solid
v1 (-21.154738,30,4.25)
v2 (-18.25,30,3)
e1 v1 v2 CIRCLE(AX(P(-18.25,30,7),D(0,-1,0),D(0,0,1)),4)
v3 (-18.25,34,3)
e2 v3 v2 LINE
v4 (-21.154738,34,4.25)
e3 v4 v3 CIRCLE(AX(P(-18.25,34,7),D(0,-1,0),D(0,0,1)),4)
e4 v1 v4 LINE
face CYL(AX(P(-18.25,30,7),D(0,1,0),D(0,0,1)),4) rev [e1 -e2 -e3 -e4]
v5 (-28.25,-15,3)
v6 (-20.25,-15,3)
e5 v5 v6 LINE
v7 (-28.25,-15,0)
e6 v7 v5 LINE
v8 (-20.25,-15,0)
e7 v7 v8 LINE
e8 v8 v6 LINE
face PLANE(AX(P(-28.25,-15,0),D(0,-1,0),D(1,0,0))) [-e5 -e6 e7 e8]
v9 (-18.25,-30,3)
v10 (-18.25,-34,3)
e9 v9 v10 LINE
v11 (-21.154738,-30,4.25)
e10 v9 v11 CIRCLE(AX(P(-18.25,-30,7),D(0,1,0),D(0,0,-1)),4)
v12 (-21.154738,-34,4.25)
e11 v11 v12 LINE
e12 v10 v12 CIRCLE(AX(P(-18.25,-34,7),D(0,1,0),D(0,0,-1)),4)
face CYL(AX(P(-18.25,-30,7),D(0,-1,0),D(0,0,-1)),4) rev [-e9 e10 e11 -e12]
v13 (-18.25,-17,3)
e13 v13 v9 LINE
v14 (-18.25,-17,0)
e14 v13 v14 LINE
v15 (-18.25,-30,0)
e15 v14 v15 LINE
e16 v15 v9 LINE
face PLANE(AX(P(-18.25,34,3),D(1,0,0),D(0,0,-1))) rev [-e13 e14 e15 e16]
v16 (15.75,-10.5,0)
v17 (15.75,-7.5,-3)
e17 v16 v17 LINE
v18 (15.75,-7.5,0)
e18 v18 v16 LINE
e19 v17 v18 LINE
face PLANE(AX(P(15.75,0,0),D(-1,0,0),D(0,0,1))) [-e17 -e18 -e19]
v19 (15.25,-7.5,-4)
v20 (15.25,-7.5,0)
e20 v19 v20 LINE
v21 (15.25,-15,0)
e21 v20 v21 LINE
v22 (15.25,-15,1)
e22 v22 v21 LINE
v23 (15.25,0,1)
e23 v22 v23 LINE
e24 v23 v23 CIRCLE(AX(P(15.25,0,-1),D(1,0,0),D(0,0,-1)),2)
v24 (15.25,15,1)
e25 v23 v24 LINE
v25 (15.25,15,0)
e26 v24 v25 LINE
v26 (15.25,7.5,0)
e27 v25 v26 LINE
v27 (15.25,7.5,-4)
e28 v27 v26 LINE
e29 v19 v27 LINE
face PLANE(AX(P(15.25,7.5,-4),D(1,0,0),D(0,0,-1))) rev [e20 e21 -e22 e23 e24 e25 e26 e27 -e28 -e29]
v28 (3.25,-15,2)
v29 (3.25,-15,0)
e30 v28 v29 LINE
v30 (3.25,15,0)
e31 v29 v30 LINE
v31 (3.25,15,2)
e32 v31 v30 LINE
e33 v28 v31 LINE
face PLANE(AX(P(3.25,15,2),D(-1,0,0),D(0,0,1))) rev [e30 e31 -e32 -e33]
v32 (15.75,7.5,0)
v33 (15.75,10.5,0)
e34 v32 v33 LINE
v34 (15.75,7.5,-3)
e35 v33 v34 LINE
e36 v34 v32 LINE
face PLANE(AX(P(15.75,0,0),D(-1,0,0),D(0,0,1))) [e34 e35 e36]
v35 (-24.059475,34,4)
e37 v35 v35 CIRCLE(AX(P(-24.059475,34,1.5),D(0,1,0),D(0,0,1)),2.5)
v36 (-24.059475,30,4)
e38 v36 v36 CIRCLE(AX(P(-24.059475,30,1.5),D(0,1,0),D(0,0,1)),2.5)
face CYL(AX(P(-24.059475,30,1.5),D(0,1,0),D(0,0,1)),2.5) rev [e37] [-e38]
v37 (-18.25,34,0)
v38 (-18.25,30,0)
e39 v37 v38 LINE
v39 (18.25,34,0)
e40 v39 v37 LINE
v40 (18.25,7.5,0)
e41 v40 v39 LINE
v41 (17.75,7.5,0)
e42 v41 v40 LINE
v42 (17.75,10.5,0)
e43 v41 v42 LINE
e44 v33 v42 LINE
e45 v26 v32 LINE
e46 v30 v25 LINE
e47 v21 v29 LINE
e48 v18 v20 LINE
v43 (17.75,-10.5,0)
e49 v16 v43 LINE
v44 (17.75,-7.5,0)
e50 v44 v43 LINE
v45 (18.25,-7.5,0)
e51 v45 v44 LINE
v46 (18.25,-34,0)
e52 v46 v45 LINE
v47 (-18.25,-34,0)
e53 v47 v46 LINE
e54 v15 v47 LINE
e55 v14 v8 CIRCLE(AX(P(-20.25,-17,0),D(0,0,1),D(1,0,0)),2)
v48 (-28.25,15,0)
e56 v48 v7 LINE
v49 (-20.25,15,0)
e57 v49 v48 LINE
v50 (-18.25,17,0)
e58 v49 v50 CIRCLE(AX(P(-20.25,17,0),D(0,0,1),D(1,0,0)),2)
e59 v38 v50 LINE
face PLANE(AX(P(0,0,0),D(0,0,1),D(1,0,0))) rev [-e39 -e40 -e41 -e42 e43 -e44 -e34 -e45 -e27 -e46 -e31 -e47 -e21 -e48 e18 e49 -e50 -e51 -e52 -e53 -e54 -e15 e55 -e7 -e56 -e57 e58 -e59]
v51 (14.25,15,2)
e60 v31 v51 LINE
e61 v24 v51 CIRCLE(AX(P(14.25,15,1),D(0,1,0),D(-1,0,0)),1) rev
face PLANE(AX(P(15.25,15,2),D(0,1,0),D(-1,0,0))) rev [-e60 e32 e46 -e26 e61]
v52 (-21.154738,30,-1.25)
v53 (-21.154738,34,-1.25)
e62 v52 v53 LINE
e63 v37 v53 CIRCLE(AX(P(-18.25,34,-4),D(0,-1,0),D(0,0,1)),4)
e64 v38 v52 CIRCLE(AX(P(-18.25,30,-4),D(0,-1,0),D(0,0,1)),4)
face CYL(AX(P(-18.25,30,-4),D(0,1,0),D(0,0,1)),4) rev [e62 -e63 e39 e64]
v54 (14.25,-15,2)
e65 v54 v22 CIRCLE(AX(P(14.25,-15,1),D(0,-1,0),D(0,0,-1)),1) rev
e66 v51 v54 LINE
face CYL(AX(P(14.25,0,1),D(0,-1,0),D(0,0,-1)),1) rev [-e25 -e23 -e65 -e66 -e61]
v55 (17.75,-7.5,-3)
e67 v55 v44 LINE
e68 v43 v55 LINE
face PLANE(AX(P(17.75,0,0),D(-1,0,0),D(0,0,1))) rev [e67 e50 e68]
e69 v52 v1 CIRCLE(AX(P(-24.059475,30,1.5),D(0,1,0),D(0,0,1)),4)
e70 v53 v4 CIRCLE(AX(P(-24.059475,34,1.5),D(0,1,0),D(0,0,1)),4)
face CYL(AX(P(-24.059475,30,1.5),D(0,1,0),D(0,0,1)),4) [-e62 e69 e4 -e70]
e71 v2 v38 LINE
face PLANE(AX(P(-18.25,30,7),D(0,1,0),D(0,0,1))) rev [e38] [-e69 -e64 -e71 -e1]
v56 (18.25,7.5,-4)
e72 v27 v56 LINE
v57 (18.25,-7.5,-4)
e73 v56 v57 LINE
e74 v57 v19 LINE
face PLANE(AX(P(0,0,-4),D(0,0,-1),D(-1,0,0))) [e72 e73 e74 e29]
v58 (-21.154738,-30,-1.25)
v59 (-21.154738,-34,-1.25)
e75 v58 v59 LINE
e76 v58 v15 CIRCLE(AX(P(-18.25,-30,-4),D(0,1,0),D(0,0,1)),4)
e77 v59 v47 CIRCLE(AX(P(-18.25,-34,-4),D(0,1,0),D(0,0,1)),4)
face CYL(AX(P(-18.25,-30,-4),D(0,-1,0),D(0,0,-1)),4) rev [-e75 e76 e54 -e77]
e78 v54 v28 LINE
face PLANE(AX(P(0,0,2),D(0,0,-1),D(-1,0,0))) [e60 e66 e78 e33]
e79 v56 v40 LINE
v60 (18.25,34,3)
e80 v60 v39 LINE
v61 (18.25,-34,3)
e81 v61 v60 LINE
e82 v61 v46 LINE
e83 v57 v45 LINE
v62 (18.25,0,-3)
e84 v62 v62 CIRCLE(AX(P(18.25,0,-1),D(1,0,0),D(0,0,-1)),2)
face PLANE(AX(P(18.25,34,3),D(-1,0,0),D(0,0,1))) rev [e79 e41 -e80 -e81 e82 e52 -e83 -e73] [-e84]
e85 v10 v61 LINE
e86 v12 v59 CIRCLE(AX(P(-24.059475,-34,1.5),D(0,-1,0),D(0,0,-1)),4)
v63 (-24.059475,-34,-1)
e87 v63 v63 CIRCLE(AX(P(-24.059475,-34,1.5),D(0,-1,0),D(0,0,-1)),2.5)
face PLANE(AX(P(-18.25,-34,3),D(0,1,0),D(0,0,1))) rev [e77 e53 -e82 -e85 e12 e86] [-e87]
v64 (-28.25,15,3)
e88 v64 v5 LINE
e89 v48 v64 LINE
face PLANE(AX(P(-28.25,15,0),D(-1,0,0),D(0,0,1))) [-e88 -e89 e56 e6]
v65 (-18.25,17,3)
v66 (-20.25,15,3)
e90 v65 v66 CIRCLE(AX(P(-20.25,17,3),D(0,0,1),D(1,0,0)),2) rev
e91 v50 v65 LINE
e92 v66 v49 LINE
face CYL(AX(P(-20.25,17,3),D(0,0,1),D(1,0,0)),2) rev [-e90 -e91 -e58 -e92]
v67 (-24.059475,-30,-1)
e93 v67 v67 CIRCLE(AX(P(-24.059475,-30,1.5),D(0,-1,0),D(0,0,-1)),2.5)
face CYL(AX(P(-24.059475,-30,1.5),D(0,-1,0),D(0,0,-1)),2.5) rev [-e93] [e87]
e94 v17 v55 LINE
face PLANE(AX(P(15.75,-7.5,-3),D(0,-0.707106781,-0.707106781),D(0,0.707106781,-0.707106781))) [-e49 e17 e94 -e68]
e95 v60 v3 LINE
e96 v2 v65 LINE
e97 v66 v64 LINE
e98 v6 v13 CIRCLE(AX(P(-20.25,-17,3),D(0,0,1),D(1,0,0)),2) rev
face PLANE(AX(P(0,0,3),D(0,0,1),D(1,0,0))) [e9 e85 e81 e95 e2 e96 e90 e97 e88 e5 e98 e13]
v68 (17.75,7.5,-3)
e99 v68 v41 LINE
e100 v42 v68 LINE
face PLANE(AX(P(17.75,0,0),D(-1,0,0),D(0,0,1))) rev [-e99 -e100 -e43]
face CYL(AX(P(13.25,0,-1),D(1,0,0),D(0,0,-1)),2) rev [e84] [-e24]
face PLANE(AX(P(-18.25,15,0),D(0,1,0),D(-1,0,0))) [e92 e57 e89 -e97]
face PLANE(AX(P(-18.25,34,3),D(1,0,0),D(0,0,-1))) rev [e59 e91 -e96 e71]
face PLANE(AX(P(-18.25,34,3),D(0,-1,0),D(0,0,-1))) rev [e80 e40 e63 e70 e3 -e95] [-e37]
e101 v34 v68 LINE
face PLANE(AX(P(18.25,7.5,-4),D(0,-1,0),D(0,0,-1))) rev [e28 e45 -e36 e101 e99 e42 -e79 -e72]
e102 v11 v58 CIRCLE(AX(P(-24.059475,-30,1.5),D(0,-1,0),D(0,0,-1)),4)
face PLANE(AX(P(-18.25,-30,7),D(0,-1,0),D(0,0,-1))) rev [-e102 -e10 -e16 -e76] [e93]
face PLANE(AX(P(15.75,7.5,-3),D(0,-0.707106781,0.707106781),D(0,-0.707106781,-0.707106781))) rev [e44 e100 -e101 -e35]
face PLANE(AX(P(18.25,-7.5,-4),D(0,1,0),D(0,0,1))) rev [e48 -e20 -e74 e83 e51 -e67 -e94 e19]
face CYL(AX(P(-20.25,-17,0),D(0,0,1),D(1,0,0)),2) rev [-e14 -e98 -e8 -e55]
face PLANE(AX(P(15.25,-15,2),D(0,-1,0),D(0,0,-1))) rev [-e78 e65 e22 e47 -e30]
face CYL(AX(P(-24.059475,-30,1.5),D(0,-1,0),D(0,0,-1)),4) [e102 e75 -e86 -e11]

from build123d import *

# Parameters (mm, degrees)
SKETCH_1_W          = 36.5
SKETCH_1_H          = 68
EXTRUDE_1_DEPTH     = 3
SKETCH_2_R          = 2.5
EXTRUDE_2_DEPTH     = 4
EXTRUDE_START       = -4
EXTRUDE_3_DEPTH     = 4
CUT_EXTRUDE_START   = -4
SKETCH_4_R          = 2.5
CUT_EXTRUDE_1_DEPTH = 4
SKETCH_5_W          = 3
SKETCH_5_H          = 15
EXTRUDE_4_DEPTH     = 4
CUT_EXTRUDE_2_DEPTH = 2
SKETCH_7_R          = 2
CUT_EXTRUDE_3_DEPTH = 5
EXTRUDE_5_DEPTH     = 1
SKETCH_9_W          = 10
SKETCH_9_H          = 30
EXTRUDE_6_DEPTH     = 3
FILLET_1_R          = 2
FILLET_2_R          = 1


with BuildPart() as part:
    # 草图1 → 凸台-拉伸1 (new body)
    with BuildSketch(Plane.XY):
        Rectangle(SKETCH_1_W, SKETCH_1_H)
    extrude(amount=EXTRUDE_1_DEPTH)

    # 草图2 → 凸台-拉伸2 (add)
    with BuildSketch(Plane.XZ.offset(34)):
        with BuildLine():
            Line((-18.25, 3), (-18.25, 0))
            ThreePointArc((-18.25, 0), (-19.83113883, -0.325765386), (-21.15473751, -1.25))
            ThreePointArc((-21.15473751, -1.25), (-28.059475019, 1.5), (-21.15473751, 4.25))
            ThreePointArc((-21.15473751, 4.25), (-19.83113883, 3.325765386), (-18.25, 3))
        make_face()
        with Locations(Location((-24.059475019, 1.5, 0), (0, 0, 270))):
            Circle(SKETCH_2_R, mode=Mode.SUBTRACT)
    extrude(amount=-EXTRUDE_2_DEPTH)

    # 草图3 → 凸台-拉伸3 (add)
    with BuildSketch(Plane(origin=(0, 34, 0), x_dir=(1, 0, 0), z_dir=(0, 1, 0)).offset(EXTRUDE_START)):
        with BuildLine():
            Line((-18.25, -3), (-18.25, 0))
            ThreePointArc((-18.25, 0), (-19.83113883, 0.325765386), (-21.15473751, 1.25))
            ThreePointArc((-21.15473751, 1.25), (-28.059475019, -1.5), (-21.15473751, -4.25))
            ThreePointArc((-21.15473751, -4.25), (-19.83113883, -3.325765386), (-18.25, -3))
        make_face()
    extrude(amount=EXTRUDE_3_DEPTH)

    # 草图4 → 切除-拉伸1 (cut)
    with BuildSketch(Plane(origin=(0, 34, 0), x_dir=(1, 0, 0), z_dir=(0, 1, 0)).offset(CUT_EXTRUDE_START)):
        with Locations(Location((-24.059475019, -1.5, 0), (0, 0, 90))):
            Circle(SKETCH_4_R)
    extrude(amount=CUT_EXTRUDE_1_DEPTH, mode=Mode.SUBTRACT)

    # 草图5 → 凸台-拉伸4 (add)
    with BuildSketch(Plane(origin=(0, 0, 0), x_dir=(-1, 0, 0), z_dir=(0, 0, -1))):
        with Locations((-16.75, 0)):
            Rectangle(SKETCH_5_W, SKETCH_5_H)
    extrude(amount=EXTRUDE_4_DEPTH)

    # 草图6 → 切除-拉伸2 (cut)
    with BuildSketch(Plane(origin=(0, 0, 0), x_dir=(-1, 0, 0), z_dir=(0, 0, -1))):
        Polygon((-15.25, 7.5), (-15.25, 15), (-3.25, 15), (-3.25, -15), (-15.25, -15), (-15.25, -7.5), align=None)
    extrude(amount=-CUT_EXTRUDE_2_DEPTH, mode=Mode.SUBTRACT)

    # 草图7 → 切除-拉伸3 (cut)
    with BuildSketch(Plane(origin=(18.25, 0, 0), x_dir=(0, 0, -1), z_dir=(1, 0, 0))):
        with Locations((1, 0)):
            Circle(SKETCH_7_R)
    extrude(amount=-CUT_EXTRUDE_3_DEPTH, mode=Mode.SUBTRACT)

    # 草图8 → 凸台-拉伸5 (add, symmetric)
    with BuildSketch(Plane.ZY.offset(-16.75)):
        Polygon((-3, 7.5), (0, 10.5), (0, 7.5), align=None)
    extrude_5 = extrude(amount=EXTRUDE_5_DEPTH, both=True)

    # 镜向1: 凸台-拉伸5 across plane
    add(extrude_5.mirror(Plane.ZX))

    # 草图9 → 凸台-拉伸6 (add)
    with BuildSketch(Plane.XY.offset(3)):
        with Locations((-23.25, 0)):
            Rectangle(SKETCH_9_W, SKETCH_9_H)
    extrude(amount=-EXTRUDE_6_DEPTH)

    # 圆角1
    fillet_1_edges = [part.edges().sort_by_distance(p)[0] for p in [
        (-18.25, 15, 1.5),
        (-18.25, -15, 1.5),
    ]]
    fillet(fillet_1_edges, radius=FILLET_1_R)

    # 圆角2
    fillet_2_edges = [part.edges().sort_by_distance(p)[0] for p in [
        (15.25, 0, 2),
    ]]
    fillet(fillet_2_edges, radius=FILLET_2_R - 0.0001)  # a hair under: the kernel refuses the full size


solid = part.part
